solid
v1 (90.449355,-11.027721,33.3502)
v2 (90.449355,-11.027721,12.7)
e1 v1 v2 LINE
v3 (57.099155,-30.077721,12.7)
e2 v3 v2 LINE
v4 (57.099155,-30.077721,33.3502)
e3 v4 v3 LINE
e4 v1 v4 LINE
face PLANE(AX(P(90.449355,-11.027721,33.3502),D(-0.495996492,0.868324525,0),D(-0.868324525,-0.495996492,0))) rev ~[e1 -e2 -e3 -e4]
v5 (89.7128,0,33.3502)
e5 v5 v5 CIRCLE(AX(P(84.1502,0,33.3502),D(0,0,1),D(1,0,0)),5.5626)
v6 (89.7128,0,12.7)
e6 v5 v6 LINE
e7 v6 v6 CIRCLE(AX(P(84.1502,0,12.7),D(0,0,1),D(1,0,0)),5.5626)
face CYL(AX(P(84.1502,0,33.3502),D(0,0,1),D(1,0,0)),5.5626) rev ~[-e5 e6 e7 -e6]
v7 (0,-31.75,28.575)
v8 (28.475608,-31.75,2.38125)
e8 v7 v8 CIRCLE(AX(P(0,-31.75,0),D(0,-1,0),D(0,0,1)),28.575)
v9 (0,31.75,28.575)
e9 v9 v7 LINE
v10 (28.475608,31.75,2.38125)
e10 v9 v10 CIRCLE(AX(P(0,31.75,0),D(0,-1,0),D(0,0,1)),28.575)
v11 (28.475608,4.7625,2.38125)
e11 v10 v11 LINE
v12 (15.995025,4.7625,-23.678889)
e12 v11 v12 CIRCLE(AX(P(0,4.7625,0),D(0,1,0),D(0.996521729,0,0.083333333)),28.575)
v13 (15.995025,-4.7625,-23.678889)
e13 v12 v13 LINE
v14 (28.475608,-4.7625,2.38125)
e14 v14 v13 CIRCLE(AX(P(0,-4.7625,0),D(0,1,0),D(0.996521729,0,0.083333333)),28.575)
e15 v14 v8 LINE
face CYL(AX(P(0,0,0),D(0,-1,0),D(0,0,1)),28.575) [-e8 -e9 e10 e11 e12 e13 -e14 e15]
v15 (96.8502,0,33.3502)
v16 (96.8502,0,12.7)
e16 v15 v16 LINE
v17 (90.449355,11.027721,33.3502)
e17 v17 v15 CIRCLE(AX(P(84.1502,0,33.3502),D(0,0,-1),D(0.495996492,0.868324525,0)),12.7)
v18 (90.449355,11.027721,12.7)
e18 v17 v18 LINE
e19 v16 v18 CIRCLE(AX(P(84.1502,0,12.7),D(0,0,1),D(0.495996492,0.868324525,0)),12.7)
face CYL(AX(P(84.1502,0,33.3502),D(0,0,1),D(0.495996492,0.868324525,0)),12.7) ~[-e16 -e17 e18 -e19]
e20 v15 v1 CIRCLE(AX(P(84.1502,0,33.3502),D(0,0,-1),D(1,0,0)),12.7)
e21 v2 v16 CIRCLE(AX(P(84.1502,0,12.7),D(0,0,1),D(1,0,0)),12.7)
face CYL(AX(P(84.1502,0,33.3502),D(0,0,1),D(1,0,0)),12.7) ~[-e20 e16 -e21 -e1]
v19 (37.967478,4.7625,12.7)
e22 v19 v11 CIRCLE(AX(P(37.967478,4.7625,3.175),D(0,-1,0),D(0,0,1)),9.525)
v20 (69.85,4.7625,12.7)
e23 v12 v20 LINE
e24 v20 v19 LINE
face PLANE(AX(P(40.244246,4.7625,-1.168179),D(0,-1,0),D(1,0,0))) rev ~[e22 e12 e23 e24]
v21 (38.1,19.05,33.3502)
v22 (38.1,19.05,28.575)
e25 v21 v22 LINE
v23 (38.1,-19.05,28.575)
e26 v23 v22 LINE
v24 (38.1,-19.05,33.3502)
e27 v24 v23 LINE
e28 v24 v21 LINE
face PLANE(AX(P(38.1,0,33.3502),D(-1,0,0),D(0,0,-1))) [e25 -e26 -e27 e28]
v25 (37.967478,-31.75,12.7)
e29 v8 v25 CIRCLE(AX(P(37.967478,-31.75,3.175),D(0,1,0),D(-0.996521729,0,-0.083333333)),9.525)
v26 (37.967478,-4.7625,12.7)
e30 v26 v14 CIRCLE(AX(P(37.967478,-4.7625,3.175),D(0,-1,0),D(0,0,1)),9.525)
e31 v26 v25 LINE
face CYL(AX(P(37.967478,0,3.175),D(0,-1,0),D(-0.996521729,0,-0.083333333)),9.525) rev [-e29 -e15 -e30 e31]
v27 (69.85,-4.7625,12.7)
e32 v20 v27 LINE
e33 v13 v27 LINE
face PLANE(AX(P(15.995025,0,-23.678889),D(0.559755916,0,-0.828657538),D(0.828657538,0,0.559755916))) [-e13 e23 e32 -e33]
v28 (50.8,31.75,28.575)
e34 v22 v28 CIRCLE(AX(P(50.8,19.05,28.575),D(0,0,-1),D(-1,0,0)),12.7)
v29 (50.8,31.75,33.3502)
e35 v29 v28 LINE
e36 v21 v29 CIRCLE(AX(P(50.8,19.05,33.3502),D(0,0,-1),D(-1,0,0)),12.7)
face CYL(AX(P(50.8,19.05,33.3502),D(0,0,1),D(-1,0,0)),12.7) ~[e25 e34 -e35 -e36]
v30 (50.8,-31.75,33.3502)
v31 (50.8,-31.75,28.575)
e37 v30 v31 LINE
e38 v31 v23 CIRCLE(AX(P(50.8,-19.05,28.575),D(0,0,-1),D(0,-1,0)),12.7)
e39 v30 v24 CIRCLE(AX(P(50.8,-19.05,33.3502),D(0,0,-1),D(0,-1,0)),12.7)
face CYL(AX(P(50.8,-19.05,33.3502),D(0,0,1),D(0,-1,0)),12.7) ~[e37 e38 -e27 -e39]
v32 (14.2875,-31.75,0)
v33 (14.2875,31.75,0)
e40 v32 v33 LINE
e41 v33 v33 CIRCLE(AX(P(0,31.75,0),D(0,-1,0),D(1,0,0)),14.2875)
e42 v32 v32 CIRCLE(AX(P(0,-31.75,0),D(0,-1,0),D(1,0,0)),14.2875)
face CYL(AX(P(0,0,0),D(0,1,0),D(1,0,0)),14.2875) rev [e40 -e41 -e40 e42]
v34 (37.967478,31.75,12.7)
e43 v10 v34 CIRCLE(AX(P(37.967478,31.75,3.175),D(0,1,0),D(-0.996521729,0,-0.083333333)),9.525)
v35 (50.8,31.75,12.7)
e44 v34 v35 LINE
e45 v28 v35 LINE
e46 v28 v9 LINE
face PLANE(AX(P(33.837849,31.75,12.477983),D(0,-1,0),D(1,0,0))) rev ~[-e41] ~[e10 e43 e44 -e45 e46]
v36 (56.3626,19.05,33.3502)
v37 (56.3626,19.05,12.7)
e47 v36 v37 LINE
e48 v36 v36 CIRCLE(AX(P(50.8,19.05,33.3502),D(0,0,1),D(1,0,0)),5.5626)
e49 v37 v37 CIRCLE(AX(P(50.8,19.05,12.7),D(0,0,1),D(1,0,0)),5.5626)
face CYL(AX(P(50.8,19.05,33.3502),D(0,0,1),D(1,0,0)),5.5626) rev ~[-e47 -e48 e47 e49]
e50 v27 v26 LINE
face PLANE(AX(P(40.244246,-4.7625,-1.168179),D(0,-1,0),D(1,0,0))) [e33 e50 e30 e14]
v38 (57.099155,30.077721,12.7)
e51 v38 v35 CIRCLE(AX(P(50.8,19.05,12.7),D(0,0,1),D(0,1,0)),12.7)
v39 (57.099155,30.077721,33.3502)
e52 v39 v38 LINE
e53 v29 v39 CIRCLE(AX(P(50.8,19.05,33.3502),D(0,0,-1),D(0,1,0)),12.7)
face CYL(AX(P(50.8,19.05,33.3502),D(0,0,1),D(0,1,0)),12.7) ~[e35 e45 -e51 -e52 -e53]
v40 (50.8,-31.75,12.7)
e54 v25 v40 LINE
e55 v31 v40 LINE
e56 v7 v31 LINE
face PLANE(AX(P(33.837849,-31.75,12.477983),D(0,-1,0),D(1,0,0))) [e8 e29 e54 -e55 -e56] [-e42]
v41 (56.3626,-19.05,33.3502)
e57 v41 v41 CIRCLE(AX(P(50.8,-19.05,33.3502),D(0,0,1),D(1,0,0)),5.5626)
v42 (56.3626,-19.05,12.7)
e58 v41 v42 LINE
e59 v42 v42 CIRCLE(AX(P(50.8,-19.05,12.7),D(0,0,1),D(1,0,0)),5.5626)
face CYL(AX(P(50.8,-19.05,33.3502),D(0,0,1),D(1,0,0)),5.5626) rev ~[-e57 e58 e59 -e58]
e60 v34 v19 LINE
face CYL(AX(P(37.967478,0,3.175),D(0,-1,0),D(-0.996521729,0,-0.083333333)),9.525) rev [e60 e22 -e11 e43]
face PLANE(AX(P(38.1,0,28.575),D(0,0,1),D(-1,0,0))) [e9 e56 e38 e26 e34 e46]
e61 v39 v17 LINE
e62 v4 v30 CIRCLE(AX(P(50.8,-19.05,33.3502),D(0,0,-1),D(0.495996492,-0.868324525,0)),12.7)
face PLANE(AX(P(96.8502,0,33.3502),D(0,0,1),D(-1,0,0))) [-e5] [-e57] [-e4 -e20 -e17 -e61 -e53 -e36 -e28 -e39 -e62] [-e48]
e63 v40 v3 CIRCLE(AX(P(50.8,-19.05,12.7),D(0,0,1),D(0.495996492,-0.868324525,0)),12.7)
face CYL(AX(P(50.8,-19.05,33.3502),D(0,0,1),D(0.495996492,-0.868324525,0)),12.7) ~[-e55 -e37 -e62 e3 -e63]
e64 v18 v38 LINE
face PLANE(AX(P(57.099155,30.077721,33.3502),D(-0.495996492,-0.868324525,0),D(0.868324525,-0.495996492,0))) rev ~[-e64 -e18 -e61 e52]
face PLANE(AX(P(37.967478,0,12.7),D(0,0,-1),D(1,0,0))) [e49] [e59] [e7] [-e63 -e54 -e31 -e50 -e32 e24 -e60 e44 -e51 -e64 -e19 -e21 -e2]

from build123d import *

# Parameters (mm, degrees)
F0_R     = 14.2875
F1_DEPTH = 31.75
F2_DEPTH = 4.7625
F4_DEPTH = 25.4
F5_DEPTH = 25.4
F6_DEPTH = 4.7752
F3_R     = 5.5626
F7_DEPTH = 25.4


with BuildPart() as f1:
    # F0 (on Front) → F1 (new body, symmetric)
    with BuildSketch(Plane.XZ):
        with BuildLine():
            Line((38.1, 28.575), (0, 28.575))
            ThreePointArc((0, 28.575), (-27.3235693319, -8.3638020041), (15.9950252975, -23.6788891364))
            ThreePointArc((15.9950252975, -23.6788891364), (25.7719232537, -12.3425522809), (28.4756083945, 2.38125))
            ThreePointArc((28.4756083945, 2.38125), (30.9572676717, 9.6234554837), (37.9674778593, 12.7))
            Line((37.9674778593, 12.7), (69.85, 12.7))
            Line((69.85, 12.7), (96.8502, 12.7))
            Line((96.8502, 12.7), (96.8502, 33.3502))
            Line((96.8502, 33.3502), (38.1, 33.3502))
            Line((38.1, 33.3502), (38.1, 28.575))
        make_face()
        Circle(F0_R, mode=Mode.SUBTRACT)
    extrude(amount=F1_DEPTH, both=True)

    # F0 (on Front) → F2 (join, symmetric)
    with BuildSketch(Plane.XZ):
        with BuildLine():
            ThreePointArc((28.4756083945, 2.38125), (25.7719232537, -12.3425522809), (15.9950252975, -23.6788891364))
            Line((15.9950252975, -23.6788891364), (69.85, 12.7))
            Line((69.85, 12.7), (37.9674778593, 12.7))
            ThreePointArc((37.9674778593, 12.7), (30.9572676717, 9.6234554837), (28.4756083945, 2.38125))
        make_face()
    extrude(amount=F2_DEPTH, both=True)

    # F3 (on face) → F4 (cut)
    with BuildSketch(Plane.XY.offset(33.3502)):
        with BuildLine():
            ThreePointArc((50.8, 31.75), (54.0586759125, 31.3248128824), (57.0991554441, 30.0777214642))
            Line((57.0991554441, 30.0777214642), (90.4493554441, 11.0277214642))
            ThreePointArc((90.4493554441, 11.0277214642), (95.1340352623, 6.3753715915), (96.8502, 0))
            Line((96.8502, 0), (96.8502, 31.75))
            Line((96.8502, 31.75), (50.8, 31.75))
        make_face()
    extrude(amount=-F4_DEPTH, mode=Mode.SUBTRACT)

    # F3 (on face) → F5 (cut)
    with BuildSketch(Plane.XY.offset(33.3502)):
        with BuildLine():
            Line((96.8502, -31.75), (96.8502, 0))
            ThreePointArc((96.8502, 0), (95.1340352623, -6.3753715915), (90.4493554441, -11.0277214642))
            Line((90.4493554441, -11.0277214642), (57.0991554441, -30.0777214642))
            ThreePointArc((57.0991554441, -30.0777214642), (54.0586759125, -31.3248128824), (50.8, -31.75))
            Line((50.8, -31.75), (96.8502, -31.75))
        make_face()
    extrude(amount=-F5_DEPTH, mode=Mode.SUBTRACT)

    # F3 (on face) → F6 (cut)
    with BuildSketch(Plane.XY.offset(33.3502)):
        with BuildLine():
            ThreePointArc((50.8, -31.75), (41.8197438789, -28.0302561211), (38.1, -19.05))
            Line((38.1, -19.05), (38.1, -31.75))
            Line((38.1, -31.75), (50.8, -31.75))
        make_face()
        with BuildLine():
            ThreePointArc((38.1, 19.05), (41.8197438789, 28.0302561211), (50.8, 31.75))
            Line((50.8, 31.75), (38.1, 31.75))
            Line((38.1, 31.75), (38.1, 19.05))
        make_face()
    extrude(amount=-F6_DEPTH, mode=Mode.SUBTRACT)

    # F3 (on face) → F7 (cut)
    with BuildSketch(Plane.XY.offset(33.3502)):
        with Locations((84.1502, 0)):
            Circle(F3_R)
        with Locations((50.8, 19.05)):
            Circle(F3_R)
        with Locations((50.8, -19.05)):
            Circle(F3_R)
    extrude(amount=-F7_DEPTH, mode=Mode.SUBTRACT)


solid = f1.part
